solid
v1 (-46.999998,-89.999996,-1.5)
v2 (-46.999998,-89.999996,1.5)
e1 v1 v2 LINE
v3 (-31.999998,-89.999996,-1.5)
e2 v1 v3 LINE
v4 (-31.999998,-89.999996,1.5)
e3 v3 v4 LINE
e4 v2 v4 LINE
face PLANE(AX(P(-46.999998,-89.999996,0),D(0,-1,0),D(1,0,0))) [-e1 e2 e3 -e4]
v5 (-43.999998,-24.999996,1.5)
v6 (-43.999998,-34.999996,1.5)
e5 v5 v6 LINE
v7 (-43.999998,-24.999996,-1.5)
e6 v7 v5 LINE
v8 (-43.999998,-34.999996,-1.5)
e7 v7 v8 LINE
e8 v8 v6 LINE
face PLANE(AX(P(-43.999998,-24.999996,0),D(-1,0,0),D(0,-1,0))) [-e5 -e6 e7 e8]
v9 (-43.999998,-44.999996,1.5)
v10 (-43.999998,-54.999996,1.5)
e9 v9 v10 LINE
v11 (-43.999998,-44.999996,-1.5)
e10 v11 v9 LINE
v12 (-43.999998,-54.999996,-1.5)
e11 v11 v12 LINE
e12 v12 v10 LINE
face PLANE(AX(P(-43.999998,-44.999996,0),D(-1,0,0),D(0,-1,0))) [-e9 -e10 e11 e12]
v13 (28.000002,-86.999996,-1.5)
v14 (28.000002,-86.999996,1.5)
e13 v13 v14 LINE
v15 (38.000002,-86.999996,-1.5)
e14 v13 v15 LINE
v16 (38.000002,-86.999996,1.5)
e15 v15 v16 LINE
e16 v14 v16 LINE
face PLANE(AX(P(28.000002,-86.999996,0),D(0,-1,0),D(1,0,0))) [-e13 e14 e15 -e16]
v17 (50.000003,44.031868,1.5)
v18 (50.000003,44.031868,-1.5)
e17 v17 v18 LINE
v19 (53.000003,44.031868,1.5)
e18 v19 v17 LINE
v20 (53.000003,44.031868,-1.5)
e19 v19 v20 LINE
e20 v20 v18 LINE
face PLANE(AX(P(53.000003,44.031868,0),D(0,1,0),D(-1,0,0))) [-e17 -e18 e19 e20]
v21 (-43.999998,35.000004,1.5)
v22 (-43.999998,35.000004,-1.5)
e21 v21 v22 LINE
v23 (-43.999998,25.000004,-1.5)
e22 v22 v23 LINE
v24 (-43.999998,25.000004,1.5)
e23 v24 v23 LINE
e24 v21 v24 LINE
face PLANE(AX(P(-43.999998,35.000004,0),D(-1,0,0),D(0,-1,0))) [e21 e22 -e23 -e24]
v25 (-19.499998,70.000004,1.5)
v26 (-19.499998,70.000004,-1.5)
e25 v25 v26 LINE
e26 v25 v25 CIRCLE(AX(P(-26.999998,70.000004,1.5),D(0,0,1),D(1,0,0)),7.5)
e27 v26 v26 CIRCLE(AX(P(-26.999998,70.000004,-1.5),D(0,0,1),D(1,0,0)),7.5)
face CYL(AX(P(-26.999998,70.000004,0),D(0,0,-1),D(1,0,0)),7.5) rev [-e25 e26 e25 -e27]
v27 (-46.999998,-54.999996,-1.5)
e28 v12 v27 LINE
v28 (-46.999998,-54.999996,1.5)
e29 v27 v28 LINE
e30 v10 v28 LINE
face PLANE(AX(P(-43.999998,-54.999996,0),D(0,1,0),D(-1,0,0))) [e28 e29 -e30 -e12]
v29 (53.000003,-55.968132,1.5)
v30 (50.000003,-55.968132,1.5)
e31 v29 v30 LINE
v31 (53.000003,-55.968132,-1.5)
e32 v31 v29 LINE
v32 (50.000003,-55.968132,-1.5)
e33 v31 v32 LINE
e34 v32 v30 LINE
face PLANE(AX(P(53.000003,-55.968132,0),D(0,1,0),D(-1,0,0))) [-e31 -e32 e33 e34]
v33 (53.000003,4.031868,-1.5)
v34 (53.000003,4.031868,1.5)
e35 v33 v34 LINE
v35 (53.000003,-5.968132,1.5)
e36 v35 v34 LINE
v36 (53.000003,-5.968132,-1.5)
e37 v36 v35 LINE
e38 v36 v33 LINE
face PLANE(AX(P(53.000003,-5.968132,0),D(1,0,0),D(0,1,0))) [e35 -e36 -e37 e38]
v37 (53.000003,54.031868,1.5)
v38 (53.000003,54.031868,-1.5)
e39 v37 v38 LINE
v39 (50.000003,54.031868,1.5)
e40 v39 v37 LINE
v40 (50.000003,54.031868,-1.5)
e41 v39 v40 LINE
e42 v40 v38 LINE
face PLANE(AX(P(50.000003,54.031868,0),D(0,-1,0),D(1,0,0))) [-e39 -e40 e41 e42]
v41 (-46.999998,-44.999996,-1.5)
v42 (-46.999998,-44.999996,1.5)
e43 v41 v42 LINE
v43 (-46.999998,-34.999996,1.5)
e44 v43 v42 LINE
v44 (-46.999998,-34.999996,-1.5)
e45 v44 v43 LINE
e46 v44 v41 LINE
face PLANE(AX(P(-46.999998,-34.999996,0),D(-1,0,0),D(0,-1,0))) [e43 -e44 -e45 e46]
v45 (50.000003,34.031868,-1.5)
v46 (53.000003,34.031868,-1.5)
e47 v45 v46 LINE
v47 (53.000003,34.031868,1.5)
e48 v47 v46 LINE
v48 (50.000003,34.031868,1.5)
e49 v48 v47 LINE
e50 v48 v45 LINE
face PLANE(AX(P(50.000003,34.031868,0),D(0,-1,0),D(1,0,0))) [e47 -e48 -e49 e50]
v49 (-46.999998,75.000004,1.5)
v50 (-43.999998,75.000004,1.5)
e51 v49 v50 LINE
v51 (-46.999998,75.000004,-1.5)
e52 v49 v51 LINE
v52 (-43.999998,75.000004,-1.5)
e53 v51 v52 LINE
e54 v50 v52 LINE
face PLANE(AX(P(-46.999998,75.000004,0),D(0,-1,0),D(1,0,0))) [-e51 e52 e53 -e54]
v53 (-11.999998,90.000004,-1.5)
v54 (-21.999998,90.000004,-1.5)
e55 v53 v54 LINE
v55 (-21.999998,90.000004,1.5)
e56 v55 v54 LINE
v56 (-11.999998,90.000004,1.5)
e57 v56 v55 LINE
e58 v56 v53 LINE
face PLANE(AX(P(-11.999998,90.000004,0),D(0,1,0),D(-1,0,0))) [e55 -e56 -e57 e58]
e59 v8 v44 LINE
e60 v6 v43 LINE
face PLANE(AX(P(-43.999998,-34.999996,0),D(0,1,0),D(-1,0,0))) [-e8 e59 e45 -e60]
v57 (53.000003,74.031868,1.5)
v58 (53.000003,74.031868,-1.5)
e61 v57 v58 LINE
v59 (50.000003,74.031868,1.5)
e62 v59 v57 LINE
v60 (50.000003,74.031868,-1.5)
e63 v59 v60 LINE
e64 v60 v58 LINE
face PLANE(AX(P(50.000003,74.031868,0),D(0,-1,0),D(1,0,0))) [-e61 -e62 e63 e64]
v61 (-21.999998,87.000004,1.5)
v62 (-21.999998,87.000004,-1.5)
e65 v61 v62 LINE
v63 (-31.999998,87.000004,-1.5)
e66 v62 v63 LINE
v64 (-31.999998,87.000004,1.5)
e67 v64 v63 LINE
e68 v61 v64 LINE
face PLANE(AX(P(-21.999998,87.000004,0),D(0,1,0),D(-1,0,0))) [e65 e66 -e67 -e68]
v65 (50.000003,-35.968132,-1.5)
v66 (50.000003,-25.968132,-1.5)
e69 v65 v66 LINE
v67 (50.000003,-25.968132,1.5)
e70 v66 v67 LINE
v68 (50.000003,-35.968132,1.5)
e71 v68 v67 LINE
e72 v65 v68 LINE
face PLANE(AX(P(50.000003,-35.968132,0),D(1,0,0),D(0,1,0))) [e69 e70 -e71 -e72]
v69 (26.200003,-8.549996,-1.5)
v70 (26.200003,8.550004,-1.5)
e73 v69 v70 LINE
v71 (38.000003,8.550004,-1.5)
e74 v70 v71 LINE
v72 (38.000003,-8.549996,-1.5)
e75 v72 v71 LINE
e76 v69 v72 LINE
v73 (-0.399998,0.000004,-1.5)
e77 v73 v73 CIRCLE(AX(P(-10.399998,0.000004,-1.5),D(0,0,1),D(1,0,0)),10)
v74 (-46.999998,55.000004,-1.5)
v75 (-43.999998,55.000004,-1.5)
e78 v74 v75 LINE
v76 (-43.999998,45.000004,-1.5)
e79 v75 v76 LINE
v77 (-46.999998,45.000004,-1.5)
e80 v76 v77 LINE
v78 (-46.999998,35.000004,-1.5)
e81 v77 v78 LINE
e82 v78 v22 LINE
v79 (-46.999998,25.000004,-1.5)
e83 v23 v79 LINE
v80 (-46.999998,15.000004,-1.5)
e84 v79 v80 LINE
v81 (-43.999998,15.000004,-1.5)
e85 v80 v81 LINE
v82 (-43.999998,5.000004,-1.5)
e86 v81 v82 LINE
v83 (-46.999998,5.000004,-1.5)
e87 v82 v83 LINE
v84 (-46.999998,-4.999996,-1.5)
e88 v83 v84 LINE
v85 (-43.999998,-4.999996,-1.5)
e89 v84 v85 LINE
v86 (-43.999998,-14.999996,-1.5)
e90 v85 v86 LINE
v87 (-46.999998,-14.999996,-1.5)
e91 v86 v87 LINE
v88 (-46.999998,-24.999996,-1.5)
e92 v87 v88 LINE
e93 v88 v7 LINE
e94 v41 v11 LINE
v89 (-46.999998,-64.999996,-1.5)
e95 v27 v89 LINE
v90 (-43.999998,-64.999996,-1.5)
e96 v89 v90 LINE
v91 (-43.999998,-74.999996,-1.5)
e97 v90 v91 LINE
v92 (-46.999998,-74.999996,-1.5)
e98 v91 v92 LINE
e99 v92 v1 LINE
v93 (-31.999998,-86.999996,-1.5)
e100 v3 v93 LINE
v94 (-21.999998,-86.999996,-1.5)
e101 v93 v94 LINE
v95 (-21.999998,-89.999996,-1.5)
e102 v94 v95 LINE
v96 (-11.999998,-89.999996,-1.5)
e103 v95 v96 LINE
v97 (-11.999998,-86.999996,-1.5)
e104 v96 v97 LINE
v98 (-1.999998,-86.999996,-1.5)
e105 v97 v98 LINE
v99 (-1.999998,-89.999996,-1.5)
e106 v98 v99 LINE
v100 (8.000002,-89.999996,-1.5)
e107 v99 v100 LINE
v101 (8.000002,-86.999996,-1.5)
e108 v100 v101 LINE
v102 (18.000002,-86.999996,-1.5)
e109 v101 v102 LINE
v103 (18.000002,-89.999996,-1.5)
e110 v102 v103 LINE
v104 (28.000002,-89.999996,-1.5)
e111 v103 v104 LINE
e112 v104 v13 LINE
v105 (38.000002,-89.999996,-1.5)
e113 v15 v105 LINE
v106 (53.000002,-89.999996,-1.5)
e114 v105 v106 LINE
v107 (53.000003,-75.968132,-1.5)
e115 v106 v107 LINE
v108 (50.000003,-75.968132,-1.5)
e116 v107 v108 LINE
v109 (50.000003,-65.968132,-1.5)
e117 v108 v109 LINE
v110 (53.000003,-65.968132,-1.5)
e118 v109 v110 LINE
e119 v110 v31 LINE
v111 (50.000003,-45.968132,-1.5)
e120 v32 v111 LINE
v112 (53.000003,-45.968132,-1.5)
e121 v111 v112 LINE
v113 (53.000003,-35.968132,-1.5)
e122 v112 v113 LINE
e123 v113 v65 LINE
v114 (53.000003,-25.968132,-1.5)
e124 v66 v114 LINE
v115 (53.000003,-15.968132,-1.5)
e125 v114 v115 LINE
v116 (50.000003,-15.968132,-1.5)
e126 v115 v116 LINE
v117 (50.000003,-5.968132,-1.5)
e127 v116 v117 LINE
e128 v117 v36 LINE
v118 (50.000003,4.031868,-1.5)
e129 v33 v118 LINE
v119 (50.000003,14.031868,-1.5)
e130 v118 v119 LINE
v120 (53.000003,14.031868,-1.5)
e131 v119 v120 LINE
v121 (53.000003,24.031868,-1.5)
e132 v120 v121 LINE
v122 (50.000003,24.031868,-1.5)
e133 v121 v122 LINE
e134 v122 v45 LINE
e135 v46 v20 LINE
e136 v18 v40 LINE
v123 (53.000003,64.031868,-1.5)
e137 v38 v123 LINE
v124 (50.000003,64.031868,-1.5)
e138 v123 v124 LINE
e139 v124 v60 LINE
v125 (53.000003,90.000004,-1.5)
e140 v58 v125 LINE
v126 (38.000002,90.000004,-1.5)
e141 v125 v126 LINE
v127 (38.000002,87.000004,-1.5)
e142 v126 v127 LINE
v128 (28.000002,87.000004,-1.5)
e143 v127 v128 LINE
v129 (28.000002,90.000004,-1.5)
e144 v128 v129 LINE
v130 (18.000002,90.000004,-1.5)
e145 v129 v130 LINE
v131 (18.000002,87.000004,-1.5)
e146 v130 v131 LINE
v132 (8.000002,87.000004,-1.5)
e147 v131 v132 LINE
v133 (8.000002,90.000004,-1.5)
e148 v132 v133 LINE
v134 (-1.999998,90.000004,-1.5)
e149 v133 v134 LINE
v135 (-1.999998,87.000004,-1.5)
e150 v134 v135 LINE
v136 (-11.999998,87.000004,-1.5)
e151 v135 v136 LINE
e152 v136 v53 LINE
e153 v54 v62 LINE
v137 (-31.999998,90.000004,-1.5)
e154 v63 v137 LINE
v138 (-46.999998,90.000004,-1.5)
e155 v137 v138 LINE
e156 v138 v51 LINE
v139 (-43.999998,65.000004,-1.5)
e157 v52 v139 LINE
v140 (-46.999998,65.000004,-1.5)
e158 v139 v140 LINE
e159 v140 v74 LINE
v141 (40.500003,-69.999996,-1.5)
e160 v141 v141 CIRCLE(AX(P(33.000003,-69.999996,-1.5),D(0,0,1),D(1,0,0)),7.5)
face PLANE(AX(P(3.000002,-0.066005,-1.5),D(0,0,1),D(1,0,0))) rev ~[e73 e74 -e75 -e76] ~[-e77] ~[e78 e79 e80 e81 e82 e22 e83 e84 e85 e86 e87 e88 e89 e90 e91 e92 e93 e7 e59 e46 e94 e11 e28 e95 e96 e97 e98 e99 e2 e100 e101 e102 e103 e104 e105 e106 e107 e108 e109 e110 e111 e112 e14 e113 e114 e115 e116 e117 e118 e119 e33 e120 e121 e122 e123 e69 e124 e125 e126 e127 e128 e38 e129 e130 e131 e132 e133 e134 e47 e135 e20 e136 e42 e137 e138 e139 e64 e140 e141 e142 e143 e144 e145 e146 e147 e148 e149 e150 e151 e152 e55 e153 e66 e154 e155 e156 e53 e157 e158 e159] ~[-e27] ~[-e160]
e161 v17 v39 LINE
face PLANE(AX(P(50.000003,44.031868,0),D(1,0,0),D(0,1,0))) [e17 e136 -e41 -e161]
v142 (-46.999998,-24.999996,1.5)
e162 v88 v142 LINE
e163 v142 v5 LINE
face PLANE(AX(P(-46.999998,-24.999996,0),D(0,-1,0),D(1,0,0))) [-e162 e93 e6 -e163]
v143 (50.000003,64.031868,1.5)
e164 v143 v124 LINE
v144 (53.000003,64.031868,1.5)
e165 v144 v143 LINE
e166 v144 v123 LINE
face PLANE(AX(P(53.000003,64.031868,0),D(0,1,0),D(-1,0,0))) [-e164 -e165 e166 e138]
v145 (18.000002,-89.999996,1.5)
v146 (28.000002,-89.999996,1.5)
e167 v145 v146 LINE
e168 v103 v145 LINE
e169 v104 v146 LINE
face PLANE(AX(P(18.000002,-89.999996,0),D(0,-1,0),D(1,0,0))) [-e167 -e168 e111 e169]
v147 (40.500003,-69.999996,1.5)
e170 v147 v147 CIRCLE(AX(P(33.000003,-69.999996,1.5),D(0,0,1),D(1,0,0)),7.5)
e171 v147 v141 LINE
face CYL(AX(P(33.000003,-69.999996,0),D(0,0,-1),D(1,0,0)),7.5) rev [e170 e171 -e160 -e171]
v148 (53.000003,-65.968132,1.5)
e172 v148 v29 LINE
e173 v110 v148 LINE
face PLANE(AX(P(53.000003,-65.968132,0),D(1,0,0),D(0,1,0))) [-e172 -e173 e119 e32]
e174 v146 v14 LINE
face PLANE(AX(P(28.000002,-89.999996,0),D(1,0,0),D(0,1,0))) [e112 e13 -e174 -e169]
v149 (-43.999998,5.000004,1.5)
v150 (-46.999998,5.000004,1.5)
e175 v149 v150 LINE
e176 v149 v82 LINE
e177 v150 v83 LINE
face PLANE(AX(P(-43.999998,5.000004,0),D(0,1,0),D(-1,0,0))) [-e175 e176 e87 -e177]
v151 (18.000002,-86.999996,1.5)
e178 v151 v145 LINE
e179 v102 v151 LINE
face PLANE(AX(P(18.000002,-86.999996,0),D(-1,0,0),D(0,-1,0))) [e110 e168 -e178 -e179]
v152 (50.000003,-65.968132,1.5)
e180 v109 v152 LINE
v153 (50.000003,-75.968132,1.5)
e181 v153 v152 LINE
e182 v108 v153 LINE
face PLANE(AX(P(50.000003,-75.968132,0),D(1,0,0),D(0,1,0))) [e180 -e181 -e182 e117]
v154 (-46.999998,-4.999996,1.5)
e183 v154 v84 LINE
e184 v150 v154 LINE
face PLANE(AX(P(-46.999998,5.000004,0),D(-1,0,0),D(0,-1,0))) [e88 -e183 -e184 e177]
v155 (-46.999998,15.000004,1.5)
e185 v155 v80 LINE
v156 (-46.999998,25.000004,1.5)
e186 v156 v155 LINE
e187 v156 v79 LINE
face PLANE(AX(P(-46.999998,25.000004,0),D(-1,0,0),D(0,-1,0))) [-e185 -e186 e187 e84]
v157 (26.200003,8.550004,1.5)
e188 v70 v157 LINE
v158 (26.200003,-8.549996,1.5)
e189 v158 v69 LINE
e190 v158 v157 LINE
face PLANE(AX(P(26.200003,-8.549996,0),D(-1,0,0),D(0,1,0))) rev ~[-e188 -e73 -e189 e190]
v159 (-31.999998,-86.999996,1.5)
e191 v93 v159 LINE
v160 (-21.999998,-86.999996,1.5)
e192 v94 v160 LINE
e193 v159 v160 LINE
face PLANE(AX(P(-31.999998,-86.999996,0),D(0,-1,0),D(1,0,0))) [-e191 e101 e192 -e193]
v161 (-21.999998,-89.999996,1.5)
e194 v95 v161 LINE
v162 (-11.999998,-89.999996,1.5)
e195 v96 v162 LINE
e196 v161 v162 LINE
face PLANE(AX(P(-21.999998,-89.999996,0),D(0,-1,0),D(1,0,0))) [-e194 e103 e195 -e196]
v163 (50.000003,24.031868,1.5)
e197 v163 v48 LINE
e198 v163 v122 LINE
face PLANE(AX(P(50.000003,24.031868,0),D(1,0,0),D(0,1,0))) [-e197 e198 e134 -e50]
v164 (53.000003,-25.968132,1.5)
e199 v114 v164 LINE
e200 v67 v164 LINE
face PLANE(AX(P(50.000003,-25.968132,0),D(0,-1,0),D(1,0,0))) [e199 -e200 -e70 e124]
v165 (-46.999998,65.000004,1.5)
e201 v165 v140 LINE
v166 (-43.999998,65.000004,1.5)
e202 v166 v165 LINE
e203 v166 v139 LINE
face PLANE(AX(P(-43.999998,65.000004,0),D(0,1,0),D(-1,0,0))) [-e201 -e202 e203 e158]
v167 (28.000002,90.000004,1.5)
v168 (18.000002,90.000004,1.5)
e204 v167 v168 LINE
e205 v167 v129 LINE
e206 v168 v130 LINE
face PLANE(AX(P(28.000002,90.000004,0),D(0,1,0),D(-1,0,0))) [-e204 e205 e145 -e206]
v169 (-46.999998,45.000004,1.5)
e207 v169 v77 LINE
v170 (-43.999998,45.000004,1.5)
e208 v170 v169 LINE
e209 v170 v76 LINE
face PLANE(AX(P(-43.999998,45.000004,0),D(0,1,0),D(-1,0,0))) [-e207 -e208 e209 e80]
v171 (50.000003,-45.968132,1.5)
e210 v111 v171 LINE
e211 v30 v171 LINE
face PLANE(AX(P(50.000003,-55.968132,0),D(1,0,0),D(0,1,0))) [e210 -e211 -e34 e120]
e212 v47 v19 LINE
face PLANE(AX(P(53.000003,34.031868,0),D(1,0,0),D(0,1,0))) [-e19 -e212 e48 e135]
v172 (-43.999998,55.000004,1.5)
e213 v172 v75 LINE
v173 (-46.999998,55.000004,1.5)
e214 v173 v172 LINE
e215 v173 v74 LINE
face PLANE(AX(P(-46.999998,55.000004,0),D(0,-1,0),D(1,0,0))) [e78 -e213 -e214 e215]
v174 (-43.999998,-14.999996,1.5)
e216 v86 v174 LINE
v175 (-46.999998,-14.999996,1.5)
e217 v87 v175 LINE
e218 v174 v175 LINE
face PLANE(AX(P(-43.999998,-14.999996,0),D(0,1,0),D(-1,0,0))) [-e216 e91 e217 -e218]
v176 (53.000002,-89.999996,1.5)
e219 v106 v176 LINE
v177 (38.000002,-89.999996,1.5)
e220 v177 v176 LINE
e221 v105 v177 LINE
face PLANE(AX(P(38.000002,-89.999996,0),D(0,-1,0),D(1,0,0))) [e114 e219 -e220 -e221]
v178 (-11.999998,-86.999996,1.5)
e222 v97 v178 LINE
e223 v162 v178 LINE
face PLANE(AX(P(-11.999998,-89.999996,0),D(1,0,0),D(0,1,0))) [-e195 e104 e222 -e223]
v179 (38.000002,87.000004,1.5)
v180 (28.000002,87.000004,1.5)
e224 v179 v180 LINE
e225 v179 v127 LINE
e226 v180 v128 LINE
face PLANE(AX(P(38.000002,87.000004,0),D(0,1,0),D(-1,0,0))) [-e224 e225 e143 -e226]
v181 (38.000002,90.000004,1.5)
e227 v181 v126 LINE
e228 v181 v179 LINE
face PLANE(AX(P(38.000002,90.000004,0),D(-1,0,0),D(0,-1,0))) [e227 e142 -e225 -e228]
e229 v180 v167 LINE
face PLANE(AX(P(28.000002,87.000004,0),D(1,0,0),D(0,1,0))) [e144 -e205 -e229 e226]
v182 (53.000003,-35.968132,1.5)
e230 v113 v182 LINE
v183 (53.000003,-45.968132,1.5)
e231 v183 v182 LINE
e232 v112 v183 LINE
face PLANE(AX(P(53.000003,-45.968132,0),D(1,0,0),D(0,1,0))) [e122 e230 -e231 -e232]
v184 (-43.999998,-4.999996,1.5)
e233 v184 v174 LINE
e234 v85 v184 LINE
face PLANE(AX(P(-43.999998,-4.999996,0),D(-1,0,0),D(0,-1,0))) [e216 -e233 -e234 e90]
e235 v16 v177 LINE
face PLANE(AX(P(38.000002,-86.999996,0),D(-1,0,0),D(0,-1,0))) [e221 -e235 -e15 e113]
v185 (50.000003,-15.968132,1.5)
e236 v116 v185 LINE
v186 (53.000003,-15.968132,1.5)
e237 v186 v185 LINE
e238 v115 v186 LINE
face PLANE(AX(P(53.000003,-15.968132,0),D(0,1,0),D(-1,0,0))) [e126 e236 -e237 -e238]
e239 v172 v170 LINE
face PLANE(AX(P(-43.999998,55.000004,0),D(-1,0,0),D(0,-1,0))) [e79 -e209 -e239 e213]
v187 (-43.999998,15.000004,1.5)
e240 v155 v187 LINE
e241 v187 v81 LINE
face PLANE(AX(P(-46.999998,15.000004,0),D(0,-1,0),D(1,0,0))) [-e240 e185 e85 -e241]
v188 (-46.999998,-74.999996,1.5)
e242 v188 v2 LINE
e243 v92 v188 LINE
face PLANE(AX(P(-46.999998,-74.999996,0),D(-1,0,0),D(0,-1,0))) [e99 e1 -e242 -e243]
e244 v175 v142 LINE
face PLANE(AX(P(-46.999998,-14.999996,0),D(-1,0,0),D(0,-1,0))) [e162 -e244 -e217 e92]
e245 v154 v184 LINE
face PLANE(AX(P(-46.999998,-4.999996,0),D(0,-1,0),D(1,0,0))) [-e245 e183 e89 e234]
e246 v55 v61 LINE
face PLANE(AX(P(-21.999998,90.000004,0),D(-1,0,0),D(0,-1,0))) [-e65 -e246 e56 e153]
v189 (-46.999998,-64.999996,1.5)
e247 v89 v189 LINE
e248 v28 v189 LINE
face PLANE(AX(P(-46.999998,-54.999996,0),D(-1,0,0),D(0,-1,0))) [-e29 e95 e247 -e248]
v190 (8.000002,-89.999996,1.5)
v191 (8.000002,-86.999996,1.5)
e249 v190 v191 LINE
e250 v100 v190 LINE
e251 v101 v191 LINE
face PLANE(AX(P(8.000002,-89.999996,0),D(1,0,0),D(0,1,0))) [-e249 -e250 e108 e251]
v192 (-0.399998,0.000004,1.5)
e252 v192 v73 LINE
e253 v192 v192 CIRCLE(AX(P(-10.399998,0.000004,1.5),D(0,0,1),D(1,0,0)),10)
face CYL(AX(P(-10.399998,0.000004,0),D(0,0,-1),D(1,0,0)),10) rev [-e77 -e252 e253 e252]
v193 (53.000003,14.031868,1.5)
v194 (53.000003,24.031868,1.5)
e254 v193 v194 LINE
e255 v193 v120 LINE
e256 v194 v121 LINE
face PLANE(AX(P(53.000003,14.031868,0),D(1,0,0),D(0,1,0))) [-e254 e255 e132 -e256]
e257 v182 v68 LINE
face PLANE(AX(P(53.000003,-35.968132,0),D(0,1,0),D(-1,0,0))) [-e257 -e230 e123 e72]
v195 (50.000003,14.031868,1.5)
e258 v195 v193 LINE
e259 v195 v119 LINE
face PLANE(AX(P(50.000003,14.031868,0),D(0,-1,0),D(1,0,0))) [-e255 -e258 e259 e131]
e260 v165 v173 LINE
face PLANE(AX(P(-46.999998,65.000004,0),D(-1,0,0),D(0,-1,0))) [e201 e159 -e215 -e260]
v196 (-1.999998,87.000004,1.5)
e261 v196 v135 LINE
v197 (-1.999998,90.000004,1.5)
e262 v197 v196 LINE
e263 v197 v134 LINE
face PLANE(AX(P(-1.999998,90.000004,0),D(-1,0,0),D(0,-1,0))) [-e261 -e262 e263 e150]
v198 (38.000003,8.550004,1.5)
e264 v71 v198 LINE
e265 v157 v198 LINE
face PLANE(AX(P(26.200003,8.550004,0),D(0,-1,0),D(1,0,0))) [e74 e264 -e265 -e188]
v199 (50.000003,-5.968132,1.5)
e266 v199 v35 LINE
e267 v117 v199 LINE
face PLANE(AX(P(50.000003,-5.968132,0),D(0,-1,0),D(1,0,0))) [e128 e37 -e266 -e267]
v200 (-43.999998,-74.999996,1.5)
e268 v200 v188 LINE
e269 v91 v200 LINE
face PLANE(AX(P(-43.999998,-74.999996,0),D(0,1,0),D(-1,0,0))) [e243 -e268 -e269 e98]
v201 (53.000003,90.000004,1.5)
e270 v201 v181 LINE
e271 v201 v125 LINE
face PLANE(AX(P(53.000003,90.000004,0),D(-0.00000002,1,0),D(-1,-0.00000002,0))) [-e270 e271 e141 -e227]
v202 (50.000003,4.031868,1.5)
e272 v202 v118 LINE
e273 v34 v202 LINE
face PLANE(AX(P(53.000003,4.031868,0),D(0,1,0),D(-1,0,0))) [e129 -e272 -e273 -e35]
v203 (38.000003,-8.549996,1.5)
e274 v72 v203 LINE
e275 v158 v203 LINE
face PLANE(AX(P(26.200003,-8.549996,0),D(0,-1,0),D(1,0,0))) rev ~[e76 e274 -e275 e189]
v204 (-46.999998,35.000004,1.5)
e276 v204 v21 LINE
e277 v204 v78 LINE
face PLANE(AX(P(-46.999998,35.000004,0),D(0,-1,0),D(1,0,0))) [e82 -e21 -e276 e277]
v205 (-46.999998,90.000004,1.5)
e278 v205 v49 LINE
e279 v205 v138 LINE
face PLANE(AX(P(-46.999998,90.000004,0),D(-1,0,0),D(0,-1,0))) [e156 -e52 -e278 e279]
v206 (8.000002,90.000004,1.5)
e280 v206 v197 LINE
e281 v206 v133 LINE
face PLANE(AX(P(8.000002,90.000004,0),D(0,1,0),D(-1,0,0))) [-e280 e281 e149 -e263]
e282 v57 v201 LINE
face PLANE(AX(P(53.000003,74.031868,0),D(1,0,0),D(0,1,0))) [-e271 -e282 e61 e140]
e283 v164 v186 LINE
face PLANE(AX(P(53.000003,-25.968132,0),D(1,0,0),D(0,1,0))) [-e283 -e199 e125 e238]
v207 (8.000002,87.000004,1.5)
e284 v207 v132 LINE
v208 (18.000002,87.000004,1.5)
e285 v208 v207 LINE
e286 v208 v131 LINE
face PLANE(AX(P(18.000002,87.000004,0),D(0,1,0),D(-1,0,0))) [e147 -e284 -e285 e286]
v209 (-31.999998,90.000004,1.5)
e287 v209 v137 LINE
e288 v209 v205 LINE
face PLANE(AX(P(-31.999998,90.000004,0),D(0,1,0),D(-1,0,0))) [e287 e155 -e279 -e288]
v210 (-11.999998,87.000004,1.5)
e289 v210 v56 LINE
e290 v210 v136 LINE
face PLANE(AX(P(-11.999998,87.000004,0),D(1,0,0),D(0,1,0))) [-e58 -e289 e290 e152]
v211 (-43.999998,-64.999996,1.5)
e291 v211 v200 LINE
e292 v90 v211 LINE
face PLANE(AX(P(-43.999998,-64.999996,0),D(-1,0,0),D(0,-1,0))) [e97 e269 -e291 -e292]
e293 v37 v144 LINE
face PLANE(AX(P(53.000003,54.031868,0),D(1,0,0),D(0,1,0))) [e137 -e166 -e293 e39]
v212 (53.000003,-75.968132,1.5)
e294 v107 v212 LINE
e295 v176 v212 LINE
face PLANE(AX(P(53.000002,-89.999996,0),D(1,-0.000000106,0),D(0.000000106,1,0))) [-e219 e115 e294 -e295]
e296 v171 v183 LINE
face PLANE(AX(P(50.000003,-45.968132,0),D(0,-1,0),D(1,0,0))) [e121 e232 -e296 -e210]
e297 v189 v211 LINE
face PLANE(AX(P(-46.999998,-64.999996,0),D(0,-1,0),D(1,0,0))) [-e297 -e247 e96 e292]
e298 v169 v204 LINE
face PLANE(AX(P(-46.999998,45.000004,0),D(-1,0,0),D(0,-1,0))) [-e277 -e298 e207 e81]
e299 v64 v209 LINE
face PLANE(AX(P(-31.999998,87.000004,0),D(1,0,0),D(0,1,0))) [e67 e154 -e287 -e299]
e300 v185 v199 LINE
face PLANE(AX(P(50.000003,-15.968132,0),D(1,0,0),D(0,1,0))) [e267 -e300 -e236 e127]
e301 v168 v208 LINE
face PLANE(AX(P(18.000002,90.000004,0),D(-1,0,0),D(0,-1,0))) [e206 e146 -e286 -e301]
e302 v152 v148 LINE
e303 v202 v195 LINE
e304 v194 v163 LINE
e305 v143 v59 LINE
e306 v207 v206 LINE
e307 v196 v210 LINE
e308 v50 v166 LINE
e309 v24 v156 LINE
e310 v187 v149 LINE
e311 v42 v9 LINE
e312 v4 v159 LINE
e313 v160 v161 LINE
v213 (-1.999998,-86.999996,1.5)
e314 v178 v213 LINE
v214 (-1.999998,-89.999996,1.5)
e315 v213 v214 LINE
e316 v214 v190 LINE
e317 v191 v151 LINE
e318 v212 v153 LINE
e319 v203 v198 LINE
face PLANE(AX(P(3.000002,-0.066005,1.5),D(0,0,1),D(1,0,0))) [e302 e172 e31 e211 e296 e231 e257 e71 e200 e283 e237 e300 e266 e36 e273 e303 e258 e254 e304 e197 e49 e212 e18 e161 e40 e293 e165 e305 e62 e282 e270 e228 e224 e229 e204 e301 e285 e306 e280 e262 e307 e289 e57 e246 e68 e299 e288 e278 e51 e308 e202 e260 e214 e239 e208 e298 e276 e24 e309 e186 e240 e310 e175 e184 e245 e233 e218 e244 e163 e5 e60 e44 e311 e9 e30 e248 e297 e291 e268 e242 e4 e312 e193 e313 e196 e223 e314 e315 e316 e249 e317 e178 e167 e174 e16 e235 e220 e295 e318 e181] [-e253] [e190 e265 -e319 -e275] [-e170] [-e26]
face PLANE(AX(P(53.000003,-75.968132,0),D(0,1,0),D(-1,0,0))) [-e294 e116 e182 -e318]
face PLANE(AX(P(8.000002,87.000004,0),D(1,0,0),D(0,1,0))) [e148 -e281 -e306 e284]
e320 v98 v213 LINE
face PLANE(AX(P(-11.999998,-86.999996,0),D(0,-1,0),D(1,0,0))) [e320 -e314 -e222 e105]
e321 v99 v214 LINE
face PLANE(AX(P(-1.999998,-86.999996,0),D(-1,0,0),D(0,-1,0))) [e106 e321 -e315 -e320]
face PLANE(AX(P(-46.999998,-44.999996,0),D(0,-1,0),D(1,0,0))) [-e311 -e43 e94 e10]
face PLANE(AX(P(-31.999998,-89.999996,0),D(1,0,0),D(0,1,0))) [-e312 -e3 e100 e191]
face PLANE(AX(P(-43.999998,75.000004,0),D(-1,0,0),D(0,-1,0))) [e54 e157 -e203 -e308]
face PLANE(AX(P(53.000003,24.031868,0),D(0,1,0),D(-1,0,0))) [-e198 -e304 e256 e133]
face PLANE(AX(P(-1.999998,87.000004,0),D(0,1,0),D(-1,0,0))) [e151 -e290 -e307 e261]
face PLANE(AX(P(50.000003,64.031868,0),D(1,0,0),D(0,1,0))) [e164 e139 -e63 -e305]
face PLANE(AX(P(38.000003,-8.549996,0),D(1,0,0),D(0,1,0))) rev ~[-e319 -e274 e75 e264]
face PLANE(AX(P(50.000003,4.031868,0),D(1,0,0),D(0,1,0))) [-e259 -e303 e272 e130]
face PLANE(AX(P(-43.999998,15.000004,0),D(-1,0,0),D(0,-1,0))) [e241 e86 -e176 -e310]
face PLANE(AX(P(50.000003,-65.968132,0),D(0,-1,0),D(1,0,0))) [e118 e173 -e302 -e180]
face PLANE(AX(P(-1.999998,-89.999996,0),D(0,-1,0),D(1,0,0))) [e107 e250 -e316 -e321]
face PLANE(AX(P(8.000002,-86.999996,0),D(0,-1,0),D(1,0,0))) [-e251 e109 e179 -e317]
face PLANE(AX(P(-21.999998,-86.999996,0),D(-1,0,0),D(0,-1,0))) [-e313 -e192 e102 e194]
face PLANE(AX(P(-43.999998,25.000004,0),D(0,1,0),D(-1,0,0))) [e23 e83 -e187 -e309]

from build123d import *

# Parameters (mm, degrees)
F0_R     = 10
F0_R_2   = 7.5
F0_W     = 11.8
F0_H     = 17.1
F1_DEPTH = 1.5


# Not quite as in the source:
# - ends of sketch curves that miss each other by under 0.0002 mm in the source are joined


with BuildPart() as f1:
    # F0 (on Top) → F1 (new body, symmetric)
    with BuildSketch(Plane.XY):
        Polygon((-46.9999983907, 3.8743e-06), (-46.9999983907, -4.9999961257), (-43.9999983907, -4.9999961257), (-43.9999983907, -14.9999961257), (-46.9999983907, -14.9999961257), (-46.9999983907, -24.9999961257), (-43.9999983907, -24.9999961257), (-43.9999983907, -34.9999961257), (-46.9999983907, -34.9999961257), (-46.9999983907, -44.9999961257), (-43.9999983907, -44.9999961257), (-43.9999983907, -54.9999961257), (-46.9999983907, -54.9999961257), (-46.9999983907, -64.9999961257), (-43.9999983907, -64.9999961257), (-43.9999983907, -74.9999961257), (-46.9999983907, -74.9999961257), (-46.9999983907, -89.9999961257), (-31.9999983907, -89.9999961257), (-31.9999983907, -86.9999961257), (-21.9999983907, -86.9999961257), (-21.9999983907, -89.9999961257), (-11.9999983907, -89.9999961257), (-11.9999983907, -86.9999961257), (-1.9999983907, -86.9999961257), (-1.9999983907, -89.9999961257), (8.0000016093, -89.9999961257), (8.0000016093, -86.9999961257), (18.0000016093, -86.9999961257), (18.0000016093, -89.9999961257), (28.0000016093, -89.9999961257), (28.0000016093, -86.9999961257), (38.0000016093, -86.9999961257), (38.0000016093, -89.9999961257), (53.0000016093, -89.9999961257), (53.0000030994, -75.968132019), (50.0000030994, -75.968132019), (50.0000030994, -65.968132019), (53.0000030994, -65.968132019), (53.0000030994, -55.968132019), (50.0000030994, -55.968132019), (50.0000030994, -45.968132019), (53.0000030994, -45.968132019), (53.0000030994, -35.968132019), (50.0000030994, -35.968132019), (50.0000030994, -25.968132019), (53.0000030994, -25.968132019), (53.0000030994, -15.968132019), (50.0000030994, -15.968132019), (50.0000030994, -5.968132019), (53.0000030994, -5.968132019), (53.0000030994, 3.8743e-06), (53.0000030994, 4.031867981), (50.0000030994, 4.031867981), (50.0000030994, 14.031867981), (53.0000030994, 14.031867981), (53.0000030994, 24.031867981), (50.0000030994, 24.031867981), (50.0000030994, 34.031867981), (53.0000030994, 34.031867981), (53.0000030994, 44.031867981), (50.0000030994, 44.031867981), (50.0000030994, 54.031867981), (53.0000030994, 54.031867981), (53.0000030994, 64.031867981), (50.0000030994, 64.031867981), (50.0000030994, 74.031867981), (53.0000030994, 74.031867981), (53.0000030994, 90.0000038743), (38.0000016093, 90.0000035763), (38.0000016093, 87.0000035763), (28.0000016093, 87.0000035763), (28.0000016093, 90.0000035763), (18.0000016093, 90.0000035763), (18.0000016093, 87.0000035763), (8.0000016093, 87.0000035763), (8.0000016093, 90.0000035763), (-1.9999983907, 90.0000035763), (-1.9999983907, 87.0000035763), (-11.9999983907, 87.0000035763), (-11.9999983907, 90.0000035763), (-21.9999983907, 90.0000035763), (-21.9999983907, 87.0000035763), (-31.9999983907, 87.0000035763), (-31.9999983907, 90.0000035763), (-46.9999983907, 90.0000035763), (-46.9999983907, 75.0000038743), (-43.9999983907, 75.0000038743), (-43.9999983907, 65.0000038743), (-46.9999983907, 65.0000038743), (-46.9999983907, 55.0000038743), (-43.9999983907, 55.0000038743), (-43.9999983907, 45.0000038743), (-46.9999983907, 45.0000038743), (-46.9999983907, 35.0000038743), (-43.9999983907, 35.0000038743), (-43.9999983907, 25.0000038743), (-46.9999983907, 25.0000038743), (-46.9999983907, 15.0000038743), (-43.9999983907, 15.0000038743), (-43.9999983907, 5.0000038743), (-46.9999983907, 5.0000038743), align=None)
        with Locations((-10.3999983907, 3.8743e-06)):
            Circle(F0_R, mode=Mode.SUBTRACT)
        with Locations((33.0000030994, -69.9999961257)):
            Circle(F0_R_2, mode=Mode.SUBTRACT)
        with Locations((-26.9999983907, 70.0000035763)):
            Circle(F0_R_2, mode=Mode.SUBTRACT)
        with Locations((32.1000030994, 3.8743e-06)):
            Rectangle(F0_W, F0_H, mode=Mode.SUBTRACT)
    extrude(amount=F1_DEPTH, both=True)


solid = f1.part
